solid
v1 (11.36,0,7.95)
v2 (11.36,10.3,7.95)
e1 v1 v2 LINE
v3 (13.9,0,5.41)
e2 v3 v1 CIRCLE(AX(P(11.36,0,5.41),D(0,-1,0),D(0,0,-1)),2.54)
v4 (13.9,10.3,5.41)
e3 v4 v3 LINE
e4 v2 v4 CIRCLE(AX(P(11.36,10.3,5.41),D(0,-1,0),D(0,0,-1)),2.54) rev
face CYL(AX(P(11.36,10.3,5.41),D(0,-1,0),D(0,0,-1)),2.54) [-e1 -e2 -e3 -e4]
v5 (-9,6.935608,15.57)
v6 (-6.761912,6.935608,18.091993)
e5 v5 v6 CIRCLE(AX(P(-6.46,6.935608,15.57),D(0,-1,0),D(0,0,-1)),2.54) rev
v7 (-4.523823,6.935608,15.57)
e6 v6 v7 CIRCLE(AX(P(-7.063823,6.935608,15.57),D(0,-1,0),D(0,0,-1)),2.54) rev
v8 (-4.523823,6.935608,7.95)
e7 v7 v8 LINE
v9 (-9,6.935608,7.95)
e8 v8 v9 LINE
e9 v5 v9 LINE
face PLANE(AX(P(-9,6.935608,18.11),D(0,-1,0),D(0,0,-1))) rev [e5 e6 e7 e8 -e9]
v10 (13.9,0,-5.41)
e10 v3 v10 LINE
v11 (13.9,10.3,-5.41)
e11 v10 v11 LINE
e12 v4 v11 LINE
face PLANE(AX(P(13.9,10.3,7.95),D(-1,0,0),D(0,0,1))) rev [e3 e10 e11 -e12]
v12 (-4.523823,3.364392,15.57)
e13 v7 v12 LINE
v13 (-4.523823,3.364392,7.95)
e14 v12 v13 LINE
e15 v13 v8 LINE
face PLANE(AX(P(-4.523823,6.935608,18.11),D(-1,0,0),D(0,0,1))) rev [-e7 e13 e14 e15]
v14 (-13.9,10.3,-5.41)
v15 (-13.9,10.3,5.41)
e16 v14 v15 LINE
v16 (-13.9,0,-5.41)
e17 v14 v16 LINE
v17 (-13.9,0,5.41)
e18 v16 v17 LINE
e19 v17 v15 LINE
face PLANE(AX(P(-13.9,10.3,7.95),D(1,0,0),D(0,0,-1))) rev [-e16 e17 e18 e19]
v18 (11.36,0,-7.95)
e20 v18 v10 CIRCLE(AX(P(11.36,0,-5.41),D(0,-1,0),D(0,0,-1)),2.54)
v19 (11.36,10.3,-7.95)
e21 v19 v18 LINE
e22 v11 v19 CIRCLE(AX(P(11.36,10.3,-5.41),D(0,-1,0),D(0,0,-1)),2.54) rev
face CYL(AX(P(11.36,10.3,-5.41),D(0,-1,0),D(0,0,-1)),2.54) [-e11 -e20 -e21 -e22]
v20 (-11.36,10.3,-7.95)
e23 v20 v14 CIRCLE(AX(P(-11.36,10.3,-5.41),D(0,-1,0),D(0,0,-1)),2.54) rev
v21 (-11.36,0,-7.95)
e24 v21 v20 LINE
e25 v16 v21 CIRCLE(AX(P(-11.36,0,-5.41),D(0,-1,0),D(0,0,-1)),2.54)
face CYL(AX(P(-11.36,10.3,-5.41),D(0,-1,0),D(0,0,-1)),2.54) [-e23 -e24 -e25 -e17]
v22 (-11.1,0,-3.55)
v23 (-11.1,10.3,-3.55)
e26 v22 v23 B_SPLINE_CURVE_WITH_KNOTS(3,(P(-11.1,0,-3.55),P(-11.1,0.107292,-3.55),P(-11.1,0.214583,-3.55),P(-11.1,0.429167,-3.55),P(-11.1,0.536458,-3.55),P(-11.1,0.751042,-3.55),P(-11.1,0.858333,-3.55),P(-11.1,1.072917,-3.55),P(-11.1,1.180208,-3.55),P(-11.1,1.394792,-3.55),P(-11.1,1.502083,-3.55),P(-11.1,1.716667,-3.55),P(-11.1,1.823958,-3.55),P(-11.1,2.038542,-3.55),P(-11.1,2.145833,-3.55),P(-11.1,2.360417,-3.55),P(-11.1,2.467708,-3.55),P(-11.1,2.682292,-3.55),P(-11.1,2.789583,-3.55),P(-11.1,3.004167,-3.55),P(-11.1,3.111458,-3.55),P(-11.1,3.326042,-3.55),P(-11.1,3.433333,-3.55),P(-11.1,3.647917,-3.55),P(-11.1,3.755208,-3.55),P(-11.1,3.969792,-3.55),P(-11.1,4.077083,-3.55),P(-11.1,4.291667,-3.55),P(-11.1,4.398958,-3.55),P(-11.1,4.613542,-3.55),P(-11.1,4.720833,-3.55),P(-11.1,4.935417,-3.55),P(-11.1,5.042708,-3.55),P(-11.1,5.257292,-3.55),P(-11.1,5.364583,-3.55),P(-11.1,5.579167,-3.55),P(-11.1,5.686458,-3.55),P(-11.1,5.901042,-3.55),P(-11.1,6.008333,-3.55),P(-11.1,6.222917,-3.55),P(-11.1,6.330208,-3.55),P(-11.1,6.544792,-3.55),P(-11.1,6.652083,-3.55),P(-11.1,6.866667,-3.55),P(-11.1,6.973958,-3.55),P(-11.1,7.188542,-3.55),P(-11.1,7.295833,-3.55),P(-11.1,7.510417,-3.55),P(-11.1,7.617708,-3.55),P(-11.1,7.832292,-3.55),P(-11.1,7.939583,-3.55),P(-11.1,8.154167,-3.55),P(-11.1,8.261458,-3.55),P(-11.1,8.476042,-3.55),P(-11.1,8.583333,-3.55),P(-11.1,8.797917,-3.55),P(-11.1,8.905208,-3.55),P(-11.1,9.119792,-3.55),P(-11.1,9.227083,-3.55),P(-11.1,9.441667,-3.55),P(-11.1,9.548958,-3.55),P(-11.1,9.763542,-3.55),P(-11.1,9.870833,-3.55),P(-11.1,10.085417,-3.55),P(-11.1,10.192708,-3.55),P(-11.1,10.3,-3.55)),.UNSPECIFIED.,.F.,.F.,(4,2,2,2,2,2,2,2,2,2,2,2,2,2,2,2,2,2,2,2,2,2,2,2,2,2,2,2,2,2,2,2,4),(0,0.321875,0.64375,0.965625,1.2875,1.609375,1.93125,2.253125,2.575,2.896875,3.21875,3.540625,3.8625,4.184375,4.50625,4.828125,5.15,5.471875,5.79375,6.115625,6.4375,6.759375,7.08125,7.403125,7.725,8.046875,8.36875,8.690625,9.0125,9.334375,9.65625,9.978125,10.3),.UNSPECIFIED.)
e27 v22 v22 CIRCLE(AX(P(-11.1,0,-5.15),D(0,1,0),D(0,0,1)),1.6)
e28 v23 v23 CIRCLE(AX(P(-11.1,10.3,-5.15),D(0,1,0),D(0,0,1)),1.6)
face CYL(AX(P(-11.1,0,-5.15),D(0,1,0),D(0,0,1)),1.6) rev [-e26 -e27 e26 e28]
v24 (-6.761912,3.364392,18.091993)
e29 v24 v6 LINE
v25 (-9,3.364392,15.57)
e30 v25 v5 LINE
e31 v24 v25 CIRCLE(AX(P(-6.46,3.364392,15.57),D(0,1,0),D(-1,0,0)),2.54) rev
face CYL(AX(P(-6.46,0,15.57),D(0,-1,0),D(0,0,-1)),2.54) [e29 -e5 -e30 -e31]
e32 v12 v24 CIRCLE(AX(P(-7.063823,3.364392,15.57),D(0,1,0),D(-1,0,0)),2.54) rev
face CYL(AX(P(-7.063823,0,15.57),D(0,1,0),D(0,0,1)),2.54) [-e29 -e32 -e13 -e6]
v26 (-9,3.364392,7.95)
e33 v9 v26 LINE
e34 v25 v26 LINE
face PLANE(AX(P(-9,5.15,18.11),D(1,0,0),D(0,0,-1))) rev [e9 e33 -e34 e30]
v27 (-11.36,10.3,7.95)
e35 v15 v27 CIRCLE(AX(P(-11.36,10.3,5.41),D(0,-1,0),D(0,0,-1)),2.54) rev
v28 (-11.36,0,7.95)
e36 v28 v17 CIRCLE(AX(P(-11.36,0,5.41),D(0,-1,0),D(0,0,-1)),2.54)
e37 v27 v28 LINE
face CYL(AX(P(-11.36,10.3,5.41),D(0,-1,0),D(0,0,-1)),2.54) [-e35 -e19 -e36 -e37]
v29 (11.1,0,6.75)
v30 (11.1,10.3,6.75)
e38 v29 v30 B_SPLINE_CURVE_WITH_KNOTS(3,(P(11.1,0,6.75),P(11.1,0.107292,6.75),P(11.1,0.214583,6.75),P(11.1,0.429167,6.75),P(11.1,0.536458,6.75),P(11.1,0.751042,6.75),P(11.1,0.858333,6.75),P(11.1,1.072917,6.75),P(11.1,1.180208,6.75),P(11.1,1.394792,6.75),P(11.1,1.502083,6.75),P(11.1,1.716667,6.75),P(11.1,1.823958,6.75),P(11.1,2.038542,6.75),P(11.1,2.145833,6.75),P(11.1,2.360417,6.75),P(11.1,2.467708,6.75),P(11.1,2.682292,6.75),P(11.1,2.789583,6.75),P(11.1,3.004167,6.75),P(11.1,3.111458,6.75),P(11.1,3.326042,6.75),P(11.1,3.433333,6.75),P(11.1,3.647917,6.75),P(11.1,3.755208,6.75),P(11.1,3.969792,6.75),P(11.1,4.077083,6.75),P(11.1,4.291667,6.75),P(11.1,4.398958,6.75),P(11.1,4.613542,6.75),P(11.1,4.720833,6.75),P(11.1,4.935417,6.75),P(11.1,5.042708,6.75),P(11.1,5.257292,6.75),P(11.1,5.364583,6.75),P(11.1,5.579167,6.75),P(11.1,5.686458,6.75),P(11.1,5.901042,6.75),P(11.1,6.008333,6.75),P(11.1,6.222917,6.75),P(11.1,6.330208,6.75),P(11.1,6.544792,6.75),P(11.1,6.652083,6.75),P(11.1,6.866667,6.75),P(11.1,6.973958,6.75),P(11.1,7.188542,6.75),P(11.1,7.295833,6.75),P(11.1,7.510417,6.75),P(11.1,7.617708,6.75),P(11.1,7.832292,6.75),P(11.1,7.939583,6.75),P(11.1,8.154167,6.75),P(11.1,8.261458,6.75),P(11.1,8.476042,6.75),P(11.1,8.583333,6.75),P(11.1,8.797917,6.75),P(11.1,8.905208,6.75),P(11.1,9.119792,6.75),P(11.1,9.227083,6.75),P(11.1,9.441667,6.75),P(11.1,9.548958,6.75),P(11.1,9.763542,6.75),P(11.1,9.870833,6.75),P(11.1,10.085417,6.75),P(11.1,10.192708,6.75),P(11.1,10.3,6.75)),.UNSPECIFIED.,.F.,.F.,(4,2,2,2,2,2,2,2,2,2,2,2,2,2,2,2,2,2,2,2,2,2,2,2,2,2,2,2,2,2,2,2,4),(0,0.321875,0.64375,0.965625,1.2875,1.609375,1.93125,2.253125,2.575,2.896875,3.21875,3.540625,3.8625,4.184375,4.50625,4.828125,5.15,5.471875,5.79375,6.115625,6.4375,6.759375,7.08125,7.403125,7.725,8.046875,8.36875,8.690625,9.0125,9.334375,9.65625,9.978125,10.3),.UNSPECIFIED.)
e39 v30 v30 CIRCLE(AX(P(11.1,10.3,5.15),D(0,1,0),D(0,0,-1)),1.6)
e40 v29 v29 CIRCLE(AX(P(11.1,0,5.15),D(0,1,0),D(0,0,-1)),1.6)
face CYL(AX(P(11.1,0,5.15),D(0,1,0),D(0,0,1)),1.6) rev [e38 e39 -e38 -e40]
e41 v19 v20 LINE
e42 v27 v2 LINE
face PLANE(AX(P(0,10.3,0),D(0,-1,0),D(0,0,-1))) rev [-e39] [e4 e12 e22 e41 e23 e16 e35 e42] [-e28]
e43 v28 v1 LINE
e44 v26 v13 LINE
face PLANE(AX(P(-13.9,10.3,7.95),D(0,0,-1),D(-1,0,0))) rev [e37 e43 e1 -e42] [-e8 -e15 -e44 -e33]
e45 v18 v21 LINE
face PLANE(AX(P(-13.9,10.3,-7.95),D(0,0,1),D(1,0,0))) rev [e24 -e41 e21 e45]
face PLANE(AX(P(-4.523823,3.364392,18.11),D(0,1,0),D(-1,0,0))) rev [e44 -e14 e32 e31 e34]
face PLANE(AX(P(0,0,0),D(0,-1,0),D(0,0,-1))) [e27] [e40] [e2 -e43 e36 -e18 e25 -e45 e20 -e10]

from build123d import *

# Parameters (mm, degrees)
SKETCH1_W           = 27.8
SKETCH1_H           = 15.9
BOSS_EXTRUDE1_DEPTH = 10.3
SKETCH3_R           = 1.6
CUT_EXTRUDE1_DEPTH  = 20.039498418
CIRPATTERN1_COUNT   = 2
BOSS_EXTRUDE2_DEPTH = 10.16
FILLET1_R           = 2.54
FILLET2_R           = 2.54


with BuildPart() as part:
    # Sketch1 → Boss-Extrude1 (new body)
    with BuildSketch(Plane(origin=(0, 0, 0), x_dir=(1, 0, 0), z_dir=(0, 1, 0))):
        Rectangle(SKETCH1_W, SKETCH1_H)
    extrude(amount=BOSS_EXTRUDE1_DEPTH)

    # Sketch3 → Cut-Extrude1 (cut, through all)
    with BuildSketch(Plane(origin=(0, 10.3, 0), x_dir=(1, 0, 0), z_dir=(0, 1, 0))):
        with Locations(Location((-11.1, 5.15, 0), (0, 0, 270))):
            Circle(SKETCH3_R)
    cut_extrude1 = extrude(amount=-CUT_EXTRUDE1_DEPTH, mode=Mode.SUBTRACT)

    # CirPattern1: Cut-Extrude1 ×2 about axis
    cirpattern1_axis = Axis((0, 0, 0), (0, 1, 0))
    for i in range(1, CIRPATTERN1_COUNT):
        add(cut_extrude1.rotate(cirpattern1_axis, i * 360 / CIRPATTERN1_COUNT), mode=Mode.SUBTRACT)

    # Sketch6 → Boss-Extrude2 (add)
    with BuildSketch(Plane.XY.offset(7.95)):
        Polygon((-9, 5.15), (-9, 6.935608094), (-4.523823192, 6.935608094), (-4.523823192, 3.364391906), (-9, 3.364391906), align=None)
    extrude(amount=BOSS_EXTRUDE2_DEPTH)

    # Fillet1
    fillet1_edges = [part.edges().sort_by_distance(p)[0] for p in [
        (13.9, 5.15, 7.95),
        (-13.9, 5.15, 7.95),
        (-13.9, 5.15, -7.95),
        (13.9, 5.15, -7.95),
    ]]
    fillet(fillet1_edges, radius=FILLET1_R)

    # Fillet2
    # the kernel refuses this fillet: 2.54 mm, written as the material it takes off along each edge
    with BuildSketch(Plane(origin=(-9, -2.985608094, 18.11), x_dir=(0, 0, -1), z_dir=(0, 1, 0)), Plane(origin=(-4.523823192, 13.285608094, 18.11), x_dir=(0, 0, -1), z_dir=(0, -1, 0))) as fillet2_piece_1:
        with BuildLine():
            CenterArc((FILLET2_R, -FILLET2_R), FILLET2_R, 90, 90)
            Line((0, -FILLET2_R), (0, 0))
            Line((0, 0), (FILLET2_R, 0))
        make_face()
    extrude(amount=16.271216188, mode=Mode.SUBTRACT)


solid = part.part
